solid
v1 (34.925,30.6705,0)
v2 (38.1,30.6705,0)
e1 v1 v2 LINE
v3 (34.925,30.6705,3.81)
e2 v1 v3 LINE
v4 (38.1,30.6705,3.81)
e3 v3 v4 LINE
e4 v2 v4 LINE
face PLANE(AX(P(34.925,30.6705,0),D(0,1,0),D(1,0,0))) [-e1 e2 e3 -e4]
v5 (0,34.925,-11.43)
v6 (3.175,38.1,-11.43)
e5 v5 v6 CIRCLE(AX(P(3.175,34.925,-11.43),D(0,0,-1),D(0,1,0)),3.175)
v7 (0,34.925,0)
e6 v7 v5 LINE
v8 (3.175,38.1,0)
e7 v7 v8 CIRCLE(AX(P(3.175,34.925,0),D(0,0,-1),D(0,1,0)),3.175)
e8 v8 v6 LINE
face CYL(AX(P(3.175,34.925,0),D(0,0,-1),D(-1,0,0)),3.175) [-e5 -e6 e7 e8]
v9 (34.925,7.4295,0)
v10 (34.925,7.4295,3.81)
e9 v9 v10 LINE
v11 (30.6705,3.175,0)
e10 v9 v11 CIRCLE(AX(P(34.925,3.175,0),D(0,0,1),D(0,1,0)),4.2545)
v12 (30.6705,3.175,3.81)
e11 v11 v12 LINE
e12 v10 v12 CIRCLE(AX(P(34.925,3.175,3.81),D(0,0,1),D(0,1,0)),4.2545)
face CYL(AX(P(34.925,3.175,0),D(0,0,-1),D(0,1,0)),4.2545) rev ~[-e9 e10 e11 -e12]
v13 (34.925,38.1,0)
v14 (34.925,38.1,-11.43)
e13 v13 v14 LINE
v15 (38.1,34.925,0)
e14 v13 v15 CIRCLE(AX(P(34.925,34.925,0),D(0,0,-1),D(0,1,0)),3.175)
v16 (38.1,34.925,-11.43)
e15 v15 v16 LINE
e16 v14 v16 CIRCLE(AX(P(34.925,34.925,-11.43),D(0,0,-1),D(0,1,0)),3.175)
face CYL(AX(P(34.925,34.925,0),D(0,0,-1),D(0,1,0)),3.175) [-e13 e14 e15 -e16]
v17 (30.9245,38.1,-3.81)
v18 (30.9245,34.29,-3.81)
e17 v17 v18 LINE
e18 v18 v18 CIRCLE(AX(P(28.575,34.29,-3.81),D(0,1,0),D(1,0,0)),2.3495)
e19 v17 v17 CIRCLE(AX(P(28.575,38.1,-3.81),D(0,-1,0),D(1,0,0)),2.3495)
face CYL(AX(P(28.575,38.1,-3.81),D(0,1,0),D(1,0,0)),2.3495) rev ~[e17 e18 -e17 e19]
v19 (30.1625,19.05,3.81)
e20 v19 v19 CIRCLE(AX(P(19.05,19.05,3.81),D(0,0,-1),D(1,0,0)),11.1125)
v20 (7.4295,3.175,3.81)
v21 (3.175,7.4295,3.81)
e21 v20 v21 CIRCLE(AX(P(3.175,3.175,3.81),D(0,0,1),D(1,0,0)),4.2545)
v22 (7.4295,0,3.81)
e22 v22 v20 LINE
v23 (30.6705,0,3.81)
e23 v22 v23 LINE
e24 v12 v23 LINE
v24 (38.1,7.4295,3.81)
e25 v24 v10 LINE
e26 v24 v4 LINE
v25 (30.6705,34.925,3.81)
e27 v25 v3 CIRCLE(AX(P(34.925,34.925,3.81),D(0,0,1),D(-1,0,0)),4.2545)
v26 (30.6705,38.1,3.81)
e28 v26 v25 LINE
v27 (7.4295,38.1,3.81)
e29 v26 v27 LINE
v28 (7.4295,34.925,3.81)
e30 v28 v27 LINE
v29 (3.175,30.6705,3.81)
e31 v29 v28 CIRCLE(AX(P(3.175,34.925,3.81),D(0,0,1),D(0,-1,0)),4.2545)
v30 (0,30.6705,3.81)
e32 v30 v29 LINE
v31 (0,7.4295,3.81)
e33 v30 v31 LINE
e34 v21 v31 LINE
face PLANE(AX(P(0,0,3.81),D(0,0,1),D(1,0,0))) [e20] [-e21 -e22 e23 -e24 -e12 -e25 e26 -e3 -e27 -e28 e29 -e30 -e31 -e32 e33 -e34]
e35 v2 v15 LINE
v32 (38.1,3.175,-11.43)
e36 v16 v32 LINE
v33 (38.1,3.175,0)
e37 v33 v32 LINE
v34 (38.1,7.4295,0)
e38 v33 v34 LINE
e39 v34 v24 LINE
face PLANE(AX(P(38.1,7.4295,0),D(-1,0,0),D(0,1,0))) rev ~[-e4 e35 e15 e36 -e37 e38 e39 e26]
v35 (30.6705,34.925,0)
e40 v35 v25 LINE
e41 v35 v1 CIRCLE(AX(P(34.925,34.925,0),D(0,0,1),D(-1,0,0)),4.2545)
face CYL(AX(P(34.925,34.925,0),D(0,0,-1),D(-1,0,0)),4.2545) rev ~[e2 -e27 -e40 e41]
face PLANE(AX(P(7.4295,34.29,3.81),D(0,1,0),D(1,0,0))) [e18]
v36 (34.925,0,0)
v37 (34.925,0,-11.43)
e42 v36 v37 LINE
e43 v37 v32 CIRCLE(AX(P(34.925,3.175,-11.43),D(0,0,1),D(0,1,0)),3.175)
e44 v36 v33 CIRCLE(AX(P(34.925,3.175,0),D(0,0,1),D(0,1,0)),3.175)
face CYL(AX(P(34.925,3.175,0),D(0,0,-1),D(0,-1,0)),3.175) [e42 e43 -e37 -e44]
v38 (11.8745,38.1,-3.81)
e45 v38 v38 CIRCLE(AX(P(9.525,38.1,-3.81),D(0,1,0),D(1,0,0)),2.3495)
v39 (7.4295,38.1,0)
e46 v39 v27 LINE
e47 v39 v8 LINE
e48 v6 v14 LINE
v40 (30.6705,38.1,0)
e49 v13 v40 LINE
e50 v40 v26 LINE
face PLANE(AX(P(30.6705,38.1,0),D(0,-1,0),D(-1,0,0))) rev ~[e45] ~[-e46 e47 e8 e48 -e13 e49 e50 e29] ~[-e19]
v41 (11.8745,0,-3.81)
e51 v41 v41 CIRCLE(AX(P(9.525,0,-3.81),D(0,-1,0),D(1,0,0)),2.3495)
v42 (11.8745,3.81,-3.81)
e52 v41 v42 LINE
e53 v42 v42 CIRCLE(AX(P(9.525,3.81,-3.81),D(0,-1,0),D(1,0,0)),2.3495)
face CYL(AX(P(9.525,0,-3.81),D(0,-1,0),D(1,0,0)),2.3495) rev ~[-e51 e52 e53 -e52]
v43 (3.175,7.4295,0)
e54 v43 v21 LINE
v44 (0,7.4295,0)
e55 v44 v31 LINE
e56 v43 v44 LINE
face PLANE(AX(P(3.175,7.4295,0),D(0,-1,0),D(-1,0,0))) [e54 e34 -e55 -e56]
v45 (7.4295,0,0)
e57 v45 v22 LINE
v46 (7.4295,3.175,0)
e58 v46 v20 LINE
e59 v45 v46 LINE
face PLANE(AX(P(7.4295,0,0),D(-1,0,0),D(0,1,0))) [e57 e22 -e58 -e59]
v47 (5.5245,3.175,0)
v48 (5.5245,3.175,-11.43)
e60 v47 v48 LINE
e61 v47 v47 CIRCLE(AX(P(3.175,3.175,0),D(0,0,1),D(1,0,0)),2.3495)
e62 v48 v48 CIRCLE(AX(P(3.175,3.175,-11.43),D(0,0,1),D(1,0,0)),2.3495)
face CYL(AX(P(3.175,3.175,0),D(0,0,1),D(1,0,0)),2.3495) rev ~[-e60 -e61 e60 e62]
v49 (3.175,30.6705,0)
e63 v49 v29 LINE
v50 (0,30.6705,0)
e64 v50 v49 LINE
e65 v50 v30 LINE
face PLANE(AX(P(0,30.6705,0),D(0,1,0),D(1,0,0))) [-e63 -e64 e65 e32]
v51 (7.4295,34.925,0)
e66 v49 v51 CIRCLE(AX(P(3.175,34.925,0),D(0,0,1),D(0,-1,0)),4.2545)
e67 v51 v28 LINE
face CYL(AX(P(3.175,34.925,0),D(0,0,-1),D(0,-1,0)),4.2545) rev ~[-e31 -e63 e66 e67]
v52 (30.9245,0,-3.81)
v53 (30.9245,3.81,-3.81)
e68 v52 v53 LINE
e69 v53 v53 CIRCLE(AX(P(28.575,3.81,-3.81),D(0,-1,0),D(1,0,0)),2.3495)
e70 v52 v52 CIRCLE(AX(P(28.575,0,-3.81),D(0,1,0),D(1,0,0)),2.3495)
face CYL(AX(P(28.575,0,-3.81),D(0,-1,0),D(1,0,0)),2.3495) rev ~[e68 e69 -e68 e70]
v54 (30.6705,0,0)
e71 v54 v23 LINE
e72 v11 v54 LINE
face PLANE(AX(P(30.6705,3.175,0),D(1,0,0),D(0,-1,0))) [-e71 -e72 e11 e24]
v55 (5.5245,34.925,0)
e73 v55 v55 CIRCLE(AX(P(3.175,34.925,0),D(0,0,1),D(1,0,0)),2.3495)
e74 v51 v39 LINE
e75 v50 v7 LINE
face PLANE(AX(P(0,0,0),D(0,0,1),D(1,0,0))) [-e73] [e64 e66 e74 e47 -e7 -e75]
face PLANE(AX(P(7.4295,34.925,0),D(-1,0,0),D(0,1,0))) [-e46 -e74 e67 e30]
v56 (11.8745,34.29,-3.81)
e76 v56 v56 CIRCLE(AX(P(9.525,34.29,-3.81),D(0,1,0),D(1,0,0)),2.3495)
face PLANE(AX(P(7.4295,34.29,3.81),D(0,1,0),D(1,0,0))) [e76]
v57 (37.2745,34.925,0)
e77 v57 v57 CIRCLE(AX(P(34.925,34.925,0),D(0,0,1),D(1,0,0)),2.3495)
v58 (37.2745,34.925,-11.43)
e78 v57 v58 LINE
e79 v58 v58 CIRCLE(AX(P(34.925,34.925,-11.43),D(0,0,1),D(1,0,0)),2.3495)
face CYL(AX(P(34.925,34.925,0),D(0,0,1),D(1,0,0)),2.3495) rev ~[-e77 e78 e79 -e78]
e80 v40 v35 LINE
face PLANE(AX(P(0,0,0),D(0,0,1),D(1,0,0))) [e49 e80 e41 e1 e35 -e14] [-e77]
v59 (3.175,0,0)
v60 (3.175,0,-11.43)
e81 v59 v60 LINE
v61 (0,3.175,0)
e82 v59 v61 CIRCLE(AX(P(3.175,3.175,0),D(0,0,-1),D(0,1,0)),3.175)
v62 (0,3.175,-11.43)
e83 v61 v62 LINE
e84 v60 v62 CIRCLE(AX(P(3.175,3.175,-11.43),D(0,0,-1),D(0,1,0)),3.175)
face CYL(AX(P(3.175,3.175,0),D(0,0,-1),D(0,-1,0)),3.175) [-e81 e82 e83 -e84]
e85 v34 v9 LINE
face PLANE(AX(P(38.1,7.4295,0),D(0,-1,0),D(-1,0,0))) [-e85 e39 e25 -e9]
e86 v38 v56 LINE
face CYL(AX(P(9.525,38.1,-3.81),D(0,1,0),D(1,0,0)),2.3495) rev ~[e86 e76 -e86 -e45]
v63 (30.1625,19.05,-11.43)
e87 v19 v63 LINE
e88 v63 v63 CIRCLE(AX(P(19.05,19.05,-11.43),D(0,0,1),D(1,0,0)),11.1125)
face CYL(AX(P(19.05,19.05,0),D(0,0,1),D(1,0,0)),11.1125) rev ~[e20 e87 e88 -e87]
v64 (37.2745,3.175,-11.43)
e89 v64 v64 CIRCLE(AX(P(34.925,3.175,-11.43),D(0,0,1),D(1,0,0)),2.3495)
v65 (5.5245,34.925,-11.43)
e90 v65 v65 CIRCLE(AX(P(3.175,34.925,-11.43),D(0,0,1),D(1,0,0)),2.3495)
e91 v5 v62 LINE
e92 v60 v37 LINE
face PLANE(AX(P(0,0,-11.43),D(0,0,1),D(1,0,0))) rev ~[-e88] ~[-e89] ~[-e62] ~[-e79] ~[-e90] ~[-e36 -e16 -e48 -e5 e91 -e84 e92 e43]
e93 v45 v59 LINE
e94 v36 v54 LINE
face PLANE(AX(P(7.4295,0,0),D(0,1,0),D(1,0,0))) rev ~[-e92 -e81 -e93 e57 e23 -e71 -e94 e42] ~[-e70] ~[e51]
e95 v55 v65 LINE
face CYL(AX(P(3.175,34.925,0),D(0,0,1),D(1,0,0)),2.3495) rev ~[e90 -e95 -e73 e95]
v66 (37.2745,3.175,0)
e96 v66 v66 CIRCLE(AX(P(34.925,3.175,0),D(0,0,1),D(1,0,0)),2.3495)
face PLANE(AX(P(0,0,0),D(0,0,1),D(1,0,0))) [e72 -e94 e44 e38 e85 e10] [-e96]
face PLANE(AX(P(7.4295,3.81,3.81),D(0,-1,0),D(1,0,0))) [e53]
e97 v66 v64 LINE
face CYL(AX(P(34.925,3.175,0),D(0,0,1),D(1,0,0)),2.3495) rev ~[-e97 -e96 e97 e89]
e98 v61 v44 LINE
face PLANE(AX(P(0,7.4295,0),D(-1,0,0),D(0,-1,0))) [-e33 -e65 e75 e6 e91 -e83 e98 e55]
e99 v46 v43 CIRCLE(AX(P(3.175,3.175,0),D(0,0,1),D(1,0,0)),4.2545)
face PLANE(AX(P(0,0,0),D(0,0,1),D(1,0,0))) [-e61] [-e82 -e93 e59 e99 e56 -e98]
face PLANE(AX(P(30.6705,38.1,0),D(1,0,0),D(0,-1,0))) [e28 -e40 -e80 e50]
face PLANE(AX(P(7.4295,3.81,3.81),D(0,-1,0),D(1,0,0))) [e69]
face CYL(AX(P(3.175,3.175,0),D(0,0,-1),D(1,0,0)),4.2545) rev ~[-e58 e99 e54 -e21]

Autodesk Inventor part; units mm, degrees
ref_plane "YZ Plane" through (0, 0, 0) normal (1, 0, 0) x (0, 1, 0)
ref_plane "XZ Plane" through (0, 0, 0) normal (0, 1, 0) x (-1, 0, 0)
ref_plane "XY Plane" through (0, 0, 0) normal (0, 0, 1) x (1, 0, 0)
sketch "Sketch1" plane through (0, 0, 0) normal (0, 0, 1) x (1, 0, 0)
  line L0 (0, 0) -> (38.1, 0)
  line L1 (38.1, 0) -> (38.1, 38.1)
  line L2 (38.1, 38.1) -> (0, 38.1)
  line L3 (0, 38.1) -> (0, 0)
  circle A0 centre (3.175, 34.925) radius 2.3495
  circle A1 centre (34.925, 34.925) radius 2.3495
  circle A2 centre (3.175, 3.175) radius 2.3495
  circle A3 centre (34.925, 3.175) radius 2.3495
  line L4 (0, 19.05) -> (19.05, 19.05)
  circle A4 centre (19.05, 19.05) radius 11.1125
  circle A5 centre (19.05, 19.05) radius 6.35
  line L5 (7.4295, 34.925) -> (7.4295, 38.1)
  line L6 (0, 30.6705) -> (3.175, 30.6705)
  arc A6 (3.175, 30.6705) -> (7.4295, 34.925) centre (3.175, 34.925) ccw
  line L7 (5.5245, 34.925) -> (7.4295, 34.925)
  line L8 (3.175, 7.4295) -> (0, 7.4295)
  line L9 (7.4295, 0) -> (7.4295, 3.175)
  arc A7 (7.4295, 3.175) -> (3.175, 7.4295) centre (3.175, 3.175) ccw
  line L10 (30.6705, 3.175) -> (30.6705, 0)
  line L11 (38.1, 7.4295) -> (34.925, 7.4295)
  arc A8 (34.925, 7.4295) -> (30.6705, 3.175) centre (34.925, 3.175) ccw
  line L12 (34.925, 30.6705) -> (38.1, 30.6705)
  line L13 (30.6705, 38.1) -> (30.6705, 34.925)
  arc A9 (30.6705, 34.925) -> (34.925, 30.6705) centre (34.925, 34.925) ccw
  line L14 (0, 7.4295) -> (0, 0)
  line L15 (0, 0) -> (7.4295, 0)
  line L16 (30.6705, 0) -> (38.1, 0)
  line L17 (38.1, 0) -> (38.1, 7.4295)
  line L18 (30.6705, 38.1) -> (38.1, 38.1)
  line L19 (38.1, 38.1) -> (38.1, 30.6705)
  dimension "d2" = 4.699
  dimension "d0" = 38.1
  dimension "d1" = 38.1
  dimension "d5" = 31.75
  dimension "d8" = 31.75
  dimension "d11" = 3.175
  dimension "d12" = 3.175
  dimension "d13" = 19.05
  dimension "d14" = 22.225
  dimension "d15" = 12.7
  dimension "d16" = 3.175
  dimension "d17" = 3.175
  dimension "d18" = 1.905
  dimension "d24" = 360
extrude "Extrusion1" add sketch "Sketch1" along normal blind 3.81 contours L9 A7 L8 L3 L6 A6 L5 L2 L13 A9 L12 L1 L11 A8 L10 L0
extrude "Extrusion2" add sketch "Sketch1" against normal blind 11.43 contours L3 L8 A7 L9 L0 | L9 A7 L8 L3 L6 A6 L5 L2 L13 A9 L12 L1 L11 A8 L10 L0 | L10 A8 L11 L1 L0 | L3 L2 L5 A6 L6 | L12 A9 L13 L2 L1
fillet "Fillet1" radius 3.175 4 edges at (38.1, 38.1, -5.715) (38.1, 0, -5.715) (0, 38.1, -5.715) (0, 0, -5.715)
sketch "Sketch2" plane through (7.4295, 38.1, 3.81) normal (0, 1, 0) x (1, 0, 0)
  line L0 (11.6205, 7.62) -> (21.1455, 7.62)
  line L1 (11.6205, 7.62) -> (2.0955, 7.62)
  circle A0 centre (2.0955, 7.62) radius 2.3495
  circle A1 centre (21.1455, 7.62) radius 2.3495
  line L2 (0, 0) -> (23.241, 0) projected
  line L3 (11.6205, 7.62) -> (11.6205, 0)
  point P0 (-7.4295, 3.81)
  dimension "d32" = 9.525
  dimension "d33" = 9.525
  dimension "d34" = 4.699
  dimension "d35" = 4.699
  dimension "d45" = 7.62
extrude "Extrusion3" cut sketch "Sketch2" against normal blind 3.81
sketch "Sketch3" plane through (7.4295, 0, 3.81) normal (0, -1, 0) x (1, 0, 0)
  line L0 (11.6205, -7.62) -> (21.1455, -7.62)
  line L1 (11.6205, -7.62) -> (2.0955, -7.62)
  circle A0 centre (2.0955, -7.62) radius 2.3495
  circle A1 centre (21.1455, -7.62) radius 2.3495
  line L2 (23.241, 0) -> (0, 0) projected
  line L3 (11.6205, -7.62) -> (11.6205, 0)
  point P0 (-7.4295, -3.81)
  dimension "d39" = 9.525
  dimension "d40" = 9.525
  dimension "d41" = 4.699
  dimension "d42" = 4.699
  dimension "d46" = 7.62
extrude "Extrusion4" cut sketch "Sketch3" against normal blind 3.81
thread "Thread1" size "10-32 UNF" class "2B" standard "ANSI Unified Screw Threads" full length
thread "Thread2" size "10-32 UNF" class "2B" standard "ANSI Unified Screw Threads" full length
thread "Thread3" size "10-32 UNF" class "2B" standard "ANSI Unified Screw Threads" full length
thread "Thread4" size "10-32 UNF" class "2B" standard "ANSI Unified Screw Threads" full length
equation "\"d16\" = d11"
equation "\"d17\" = d11"
properties part number "Gearbox End Plate" material "Aluminum-6061"
